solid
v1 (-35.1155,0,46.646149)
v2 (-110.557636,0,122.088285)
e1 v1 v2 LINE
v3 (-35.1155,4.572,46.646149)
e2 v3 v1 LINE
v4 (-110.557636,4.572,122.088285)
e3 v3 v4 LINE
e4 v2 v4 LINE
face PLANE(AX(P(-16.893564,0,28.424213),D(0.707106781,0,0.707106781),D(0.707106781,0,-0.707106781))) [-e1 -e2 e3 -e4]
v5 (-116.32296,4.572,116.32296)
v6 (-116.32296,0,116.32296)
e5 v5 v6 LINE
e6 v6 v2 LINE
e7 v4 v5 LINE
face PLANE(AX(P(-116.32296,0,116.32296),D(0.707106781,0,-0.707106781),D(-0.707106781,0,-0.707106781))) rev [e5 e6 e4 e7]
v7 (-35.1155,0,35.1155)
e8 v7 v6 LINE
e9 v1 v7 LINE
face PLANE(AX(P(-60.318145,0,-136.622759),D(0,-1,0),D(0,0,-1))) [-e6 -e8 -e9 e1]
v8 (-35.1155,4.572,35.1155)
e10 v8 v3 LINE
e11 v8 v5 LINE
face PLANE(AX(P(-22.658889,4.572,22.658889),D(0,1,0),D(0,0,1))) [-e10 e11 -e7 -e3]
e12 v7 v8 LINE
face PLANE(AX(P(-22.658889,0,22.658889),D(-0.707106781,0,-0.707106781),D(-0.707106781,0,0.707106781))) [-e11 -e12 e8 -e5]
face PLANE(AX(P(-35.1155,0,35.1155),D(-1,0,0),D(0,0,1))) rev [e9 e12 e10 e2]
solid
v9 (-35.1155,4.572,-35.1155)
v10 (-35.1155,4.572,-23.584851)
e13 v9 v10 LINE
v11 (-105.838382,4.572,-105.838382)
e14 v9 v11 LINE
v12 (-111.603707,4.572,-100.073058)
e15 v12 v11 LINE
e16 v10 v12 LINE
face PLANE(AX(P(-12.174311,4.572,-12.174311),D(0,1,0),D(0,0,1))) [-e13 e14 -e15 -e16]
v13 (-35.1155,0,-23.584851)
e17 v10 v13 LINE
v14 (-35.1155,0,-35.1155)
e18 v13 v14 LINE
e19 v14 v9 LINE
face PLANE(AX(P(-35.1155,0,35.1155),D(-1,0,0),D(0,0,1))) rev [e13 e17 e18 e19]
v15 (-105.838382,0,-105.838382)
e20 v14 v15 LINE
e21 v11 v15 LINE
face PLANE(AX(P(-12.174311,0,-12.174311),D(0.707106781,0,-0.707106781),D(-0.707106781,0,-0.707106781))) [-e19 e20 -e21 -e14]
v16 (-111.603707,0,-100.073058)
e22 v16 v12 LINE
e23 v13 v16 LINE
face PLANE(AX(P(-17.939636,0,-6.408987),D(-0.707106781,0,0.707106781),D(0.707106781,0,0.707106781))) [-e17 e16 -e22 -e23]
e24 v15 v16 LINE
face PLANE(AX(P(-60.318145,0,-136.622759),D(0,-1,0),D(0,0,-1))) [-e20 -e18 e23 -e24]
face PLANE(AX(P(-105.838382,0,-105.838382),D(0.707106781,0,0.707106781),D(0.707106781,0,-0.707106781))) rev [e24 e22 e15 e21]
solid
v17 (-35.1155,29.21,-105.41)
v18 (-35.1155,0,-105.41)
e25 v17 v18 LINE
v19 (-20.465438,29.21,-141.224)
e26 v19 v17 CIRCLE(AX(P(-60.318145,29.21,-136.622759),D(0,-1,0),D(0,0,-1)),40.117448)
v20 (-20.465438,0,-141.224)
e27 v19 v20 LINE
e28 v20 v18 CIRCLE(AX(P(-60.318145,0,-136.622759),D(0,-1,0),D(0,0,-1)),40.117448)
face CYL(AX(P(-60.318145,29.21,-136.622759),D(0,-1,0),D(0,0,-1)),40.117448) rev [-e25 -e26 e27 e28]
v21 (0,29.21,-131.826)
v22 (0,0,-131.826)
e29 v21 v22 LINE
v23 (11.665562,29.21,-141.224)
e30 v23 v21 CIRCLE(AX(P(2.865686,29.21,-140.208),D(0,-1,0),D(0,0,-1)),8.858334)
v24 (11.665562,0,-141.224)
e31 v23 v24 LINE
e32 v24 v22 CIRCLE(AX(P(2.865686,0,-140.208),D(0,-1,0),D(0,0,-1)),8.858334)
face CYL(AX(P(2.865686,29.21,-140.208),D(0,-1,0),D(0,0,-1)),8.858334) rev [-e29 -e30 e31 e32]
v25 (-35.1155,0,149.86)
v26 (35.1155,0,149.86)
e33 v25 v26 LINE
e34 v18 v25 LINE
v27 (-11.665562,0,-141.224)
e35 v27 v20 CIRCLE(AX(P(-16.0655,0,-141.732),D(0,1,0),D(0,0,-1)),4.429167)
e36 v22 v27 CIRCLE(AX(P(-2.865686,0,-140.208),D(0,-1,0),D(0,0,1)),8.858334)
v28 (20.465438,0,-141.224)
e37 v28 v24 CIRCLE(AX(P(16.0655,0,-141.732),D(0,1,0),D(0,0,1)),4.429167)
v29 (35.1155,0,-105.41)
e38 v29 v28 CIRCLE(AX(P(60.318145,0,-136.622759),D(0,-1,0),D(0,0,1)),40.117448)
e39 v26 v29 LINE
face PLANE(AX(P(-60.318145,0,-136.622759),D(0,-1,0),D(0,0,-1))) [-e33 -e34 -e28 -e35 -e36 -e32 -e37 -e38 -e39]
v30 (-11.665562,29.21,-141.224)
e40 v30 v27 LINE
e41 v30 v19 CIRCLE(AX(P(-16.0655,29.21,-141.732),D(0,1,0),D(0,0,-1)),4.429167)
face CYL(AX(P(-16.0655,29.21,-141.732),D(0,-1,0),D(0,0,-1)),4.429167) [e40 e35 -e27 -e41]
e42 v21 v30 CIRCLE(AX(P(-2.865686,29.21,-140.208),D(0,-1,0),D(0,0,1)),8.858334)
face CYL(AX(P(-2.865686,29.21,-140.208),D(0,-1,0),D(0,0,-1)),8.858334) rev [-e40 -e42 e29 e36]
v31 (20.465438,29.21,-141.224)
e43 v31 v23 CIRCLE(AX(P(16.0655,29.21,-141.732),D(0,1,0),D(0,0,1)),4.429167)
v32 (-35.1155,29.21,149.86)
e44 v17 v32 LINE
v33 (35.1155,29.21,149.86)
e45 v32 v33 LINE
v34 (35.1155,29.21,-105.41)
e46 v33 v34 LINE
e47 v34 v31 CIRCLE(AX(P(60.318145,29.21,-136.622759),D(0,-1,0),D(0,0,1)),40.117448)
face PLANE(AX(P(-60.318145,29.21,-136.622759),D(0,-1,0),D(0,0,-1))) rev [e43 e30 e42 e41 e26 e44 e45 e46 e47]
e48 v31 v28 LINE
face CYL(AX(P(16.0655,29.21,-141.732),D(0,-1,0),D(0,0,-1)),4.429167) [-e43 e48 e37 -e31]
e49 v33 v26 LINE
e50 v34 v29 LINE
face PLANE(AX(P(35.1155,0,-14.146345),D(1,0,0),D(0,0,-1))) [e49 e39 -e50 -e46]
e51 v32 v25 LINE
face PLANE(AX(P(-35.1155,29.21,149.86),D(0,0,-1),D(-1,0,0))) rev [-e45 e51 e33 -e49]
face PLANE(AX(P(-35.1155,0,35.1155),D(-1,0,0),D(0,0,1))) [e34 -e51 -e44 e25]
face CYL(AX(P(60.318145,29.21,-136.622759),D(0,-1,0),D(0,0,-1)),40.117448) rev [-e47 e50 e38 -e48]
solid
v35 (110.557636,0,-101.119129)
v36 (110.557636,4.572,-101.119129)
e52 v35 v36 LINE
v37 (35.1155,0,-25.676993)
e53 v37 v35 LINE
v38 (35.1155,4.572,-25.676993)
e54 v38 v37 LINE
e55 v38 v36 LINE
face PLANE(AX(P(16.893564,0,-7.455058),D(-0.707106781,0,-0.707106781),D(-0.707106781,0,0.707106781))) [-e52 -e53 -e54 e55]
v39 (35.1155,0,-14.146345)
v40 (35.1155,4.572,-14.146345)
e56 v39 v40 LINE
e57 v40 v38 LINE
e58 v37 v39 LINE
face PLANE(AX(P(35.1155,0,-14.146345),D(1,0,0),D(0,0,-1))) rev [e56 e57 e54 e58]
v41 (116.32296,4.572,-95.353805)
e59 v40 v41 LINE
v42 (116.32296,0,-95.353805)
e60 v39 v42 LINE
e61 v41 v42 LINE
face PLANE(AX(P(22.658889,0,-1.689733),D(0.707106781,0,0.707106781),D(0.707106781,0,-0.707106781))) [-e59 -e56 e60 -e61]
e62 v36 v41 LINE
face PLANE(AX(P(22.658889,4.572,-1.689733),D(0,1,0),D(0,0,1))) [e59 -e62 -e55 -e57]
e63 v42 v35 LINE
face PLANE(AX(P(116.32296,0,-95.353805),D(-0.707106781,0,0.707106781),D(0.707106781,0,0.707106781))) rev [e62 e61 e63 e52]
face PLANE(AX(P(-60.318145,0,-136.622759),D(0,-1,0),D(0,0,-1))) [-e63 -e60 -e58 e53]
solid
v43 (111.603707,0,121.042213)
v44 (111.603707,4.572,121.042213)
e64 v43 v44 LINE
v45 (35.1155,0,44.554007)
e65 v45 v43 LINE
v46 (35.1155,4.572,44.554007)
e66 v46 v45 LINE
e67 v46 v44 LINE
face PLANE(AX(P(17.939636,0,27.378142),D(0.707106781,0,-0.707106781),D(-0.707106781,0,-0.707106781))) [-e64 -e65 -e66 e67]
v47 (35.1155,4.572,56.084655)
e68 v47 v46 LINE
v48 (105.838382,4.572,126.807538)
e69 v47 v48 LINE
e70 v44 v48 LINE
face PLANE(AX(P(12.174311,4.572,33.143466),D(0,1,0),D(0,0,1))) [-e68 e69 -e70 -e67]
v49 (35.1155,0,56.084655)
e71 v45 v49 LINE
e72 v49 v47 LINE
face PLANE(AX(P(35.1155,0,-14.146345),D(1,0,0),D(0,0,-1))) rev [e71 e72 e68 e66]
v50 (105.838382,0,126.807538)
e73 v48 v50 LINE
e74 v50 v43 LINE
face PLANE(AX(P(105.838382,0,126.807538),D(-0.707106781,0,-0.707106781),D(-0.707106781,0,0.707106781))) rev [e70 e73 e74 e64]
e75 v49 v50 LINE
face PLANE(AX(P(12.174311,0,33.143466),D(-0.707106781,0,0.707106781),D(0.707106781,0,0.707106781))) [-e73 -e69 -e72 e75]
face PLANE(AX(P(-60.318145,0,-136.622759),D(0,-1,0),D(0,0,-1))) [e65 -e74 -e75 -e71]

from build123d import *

# Parameters (mm, degrees)
BODY_DEPTH     = 29.21
ARM4_START     = -30.861
SKETCH3_W      = 8.1534
SKETCH3_H      = 4.572
ARM4_DEPTH     = 132.461
ARMS_COUNT     = 4
SPLIT1_DEPTH   = 4.572
SPLIT1_2_DEPTH = 4.572
SPLIT1_3_DEPTH = 4.572
SPLIT1_4_DEPTH = 4.572
SPLIT1_5_DEPTH = 4.572


# Read off the part's stored shape, not the designer's step: Split1
with BuildPart() as part:
    # Sketch1 → Body (new body)
    with BuildSketch(Plane(origin=(0, 0, 0), x_dir=(1, 0, 0), z_dir=(0, 1, 0))):
        with BuildLine():
            Line((-35.1155, -149.86), (35.1155, -149.86))
            Line((35.1155, -149.86), (35.1155, 105.41))
            ThreePointArc((35.1155, 105.41), (23.187155862, 121.433970368), (20.465438127, 141.224))
            ThreePointArc((20.465438127, 141.224), (16.0655, 146.16116691), (11.665561873, 141.224))
            ThreePointArc((11.665561873, 141.224), (8.42304611, 133.309752218), (0, 131.826))
            ThreePointArc((0, 131.826), (-8.42304611, 133.309752218), (-11.665561873, 141.224))
            ThreePointArc((-11.665561873, 141.224), (-16.0655, 146.16116691), (-20.465438127, 141.224))
            ThreePointArc((-20.465438127, 141.224), (-23.187155862, 121.433970368), (-35.1155, 105.41))
            Line((-35.1155, 105.41), (-35.1155, -149.86))
        make_face()
    extrude(amount=BODY_DEPTH)

    # Sketch3 → Arm4 (add)
    with BuildSketch(Plane(origin=(-33.996333455, 0, -33.996333455), x_dir=(-0.7071067811865487, 0, 0.7071067811865465), z_dir=(-0.7071067811865465, 0, -0.7071067811865487)).offset(ARM4_START)):
        with Locations((4.0767, 2.286)):
            Rectangle(SKETCH3_W, SKETCH3_H)
    arm4 = extrude(amount=ARM4_DEPTH)

    # Arms: Arm4 ×4 about axis
    arms_axis = Axis((0, 0, 10.484577686), (0, 1, 0))
    for i in range(1, ARMS_COUNT):
        add(arm4.rotate(arms_axis, i * 360 / ARMS_COUNT))

    # Split1 outline → Split1 (cut)
    with BuildSketch(Plane(origin=(0, 0, 0), x_dir=(1, 0, 0), z_dir=(0, 1, 0))):
        Polygon((-35.1155, 23.584851141), (-35.1155, 35.1155), (-105.838382424, 105.838382424), (-111.603706853, 100.073057994), align=None)
        Polygon((-35.1155, -46.646148859), (-35.1155, -35.1155), (-116.322960109, -116.322960109), (-110.55763568, -122.088284539), align=None)
        Polygon((35.1155, -44.554006512), (35.1155, -56.084655371), (105.838382424, -126.807537795), (111.603706853, -121.042213365), align=None)
        Polygon((35.1155, 25.676993488), (35.1155, 14.146344629), (116.322960109, 95.353804738), (110.55763568, 101.119129168), align=None)
    extrude(amount=SPLIT1_DEPTH, mode=Mode.SUBTRACT)


with BuildPart() as body_2:
    # Split1 2 outline → Split1 2 (new body)
    with BuildSketch(Plane(origin=(0, 0, 0), x_dir=(1, 0, 0), z_dir=(0, 1, 0))):
        Polygon((-35.1155, -46.646148859), (-35.1155, -35.1155), (-116.322960109, -116.322960109), (-110.55763568, -122.088284539), align=None)
    extrude(amount=SPLIT1_2_DEPTH)


with BuildPart() as body_3:
    # Split1 3 outline → Split1 3 (new body)
    with BuildSketch(Plane(origin=(0, 0, 0), x_dir=(1, 0, 0), z_dir=(0, 1, 0))):
        Polygon((-35.1155, 23.584851141), (-35.1155, 35.1155), (-105.838382424, 105.838382424), (-111.603706853, 100.073057994), align=None)
    extrude(amount=SPLIT1_3_DEPTH)


with BuildPart() as body_4:
    # Split1 4 outline → Split1 4 (new body)
    with BuildSketch(Plane(origin=(0, 0, 0), x_dir=(1, 0, 0), z_dir=(0, 1, 0))):
        Polygon((35.1155, 25.676993488), (35.1155, 14.146344629), (116.322960109, 95.353804738), (110.55763568, 101.119129168), align=None)
    extrude(amount=SPLIT1_4_DEPTH)


with BuildPart() as body_5:
    # Split1 5 outline → Split1 5 (new body)
    with BuildSketch(Plane(origin=(0, 0, 0), x_dir=(1, 0, 0), z_dir=(0, 1, 0))):
        Polygon((35.1155, -44.554006512), (35.1155, -56.084655371), (105.838382424, -126.807537795), (111.603706853, -121.042213365), align=None)
    extrude(amount=SPLIT1_5_DEPTH)


solid = Compound([part.part, body_2.part, body_3.part, body_4.part, body_5.part])
